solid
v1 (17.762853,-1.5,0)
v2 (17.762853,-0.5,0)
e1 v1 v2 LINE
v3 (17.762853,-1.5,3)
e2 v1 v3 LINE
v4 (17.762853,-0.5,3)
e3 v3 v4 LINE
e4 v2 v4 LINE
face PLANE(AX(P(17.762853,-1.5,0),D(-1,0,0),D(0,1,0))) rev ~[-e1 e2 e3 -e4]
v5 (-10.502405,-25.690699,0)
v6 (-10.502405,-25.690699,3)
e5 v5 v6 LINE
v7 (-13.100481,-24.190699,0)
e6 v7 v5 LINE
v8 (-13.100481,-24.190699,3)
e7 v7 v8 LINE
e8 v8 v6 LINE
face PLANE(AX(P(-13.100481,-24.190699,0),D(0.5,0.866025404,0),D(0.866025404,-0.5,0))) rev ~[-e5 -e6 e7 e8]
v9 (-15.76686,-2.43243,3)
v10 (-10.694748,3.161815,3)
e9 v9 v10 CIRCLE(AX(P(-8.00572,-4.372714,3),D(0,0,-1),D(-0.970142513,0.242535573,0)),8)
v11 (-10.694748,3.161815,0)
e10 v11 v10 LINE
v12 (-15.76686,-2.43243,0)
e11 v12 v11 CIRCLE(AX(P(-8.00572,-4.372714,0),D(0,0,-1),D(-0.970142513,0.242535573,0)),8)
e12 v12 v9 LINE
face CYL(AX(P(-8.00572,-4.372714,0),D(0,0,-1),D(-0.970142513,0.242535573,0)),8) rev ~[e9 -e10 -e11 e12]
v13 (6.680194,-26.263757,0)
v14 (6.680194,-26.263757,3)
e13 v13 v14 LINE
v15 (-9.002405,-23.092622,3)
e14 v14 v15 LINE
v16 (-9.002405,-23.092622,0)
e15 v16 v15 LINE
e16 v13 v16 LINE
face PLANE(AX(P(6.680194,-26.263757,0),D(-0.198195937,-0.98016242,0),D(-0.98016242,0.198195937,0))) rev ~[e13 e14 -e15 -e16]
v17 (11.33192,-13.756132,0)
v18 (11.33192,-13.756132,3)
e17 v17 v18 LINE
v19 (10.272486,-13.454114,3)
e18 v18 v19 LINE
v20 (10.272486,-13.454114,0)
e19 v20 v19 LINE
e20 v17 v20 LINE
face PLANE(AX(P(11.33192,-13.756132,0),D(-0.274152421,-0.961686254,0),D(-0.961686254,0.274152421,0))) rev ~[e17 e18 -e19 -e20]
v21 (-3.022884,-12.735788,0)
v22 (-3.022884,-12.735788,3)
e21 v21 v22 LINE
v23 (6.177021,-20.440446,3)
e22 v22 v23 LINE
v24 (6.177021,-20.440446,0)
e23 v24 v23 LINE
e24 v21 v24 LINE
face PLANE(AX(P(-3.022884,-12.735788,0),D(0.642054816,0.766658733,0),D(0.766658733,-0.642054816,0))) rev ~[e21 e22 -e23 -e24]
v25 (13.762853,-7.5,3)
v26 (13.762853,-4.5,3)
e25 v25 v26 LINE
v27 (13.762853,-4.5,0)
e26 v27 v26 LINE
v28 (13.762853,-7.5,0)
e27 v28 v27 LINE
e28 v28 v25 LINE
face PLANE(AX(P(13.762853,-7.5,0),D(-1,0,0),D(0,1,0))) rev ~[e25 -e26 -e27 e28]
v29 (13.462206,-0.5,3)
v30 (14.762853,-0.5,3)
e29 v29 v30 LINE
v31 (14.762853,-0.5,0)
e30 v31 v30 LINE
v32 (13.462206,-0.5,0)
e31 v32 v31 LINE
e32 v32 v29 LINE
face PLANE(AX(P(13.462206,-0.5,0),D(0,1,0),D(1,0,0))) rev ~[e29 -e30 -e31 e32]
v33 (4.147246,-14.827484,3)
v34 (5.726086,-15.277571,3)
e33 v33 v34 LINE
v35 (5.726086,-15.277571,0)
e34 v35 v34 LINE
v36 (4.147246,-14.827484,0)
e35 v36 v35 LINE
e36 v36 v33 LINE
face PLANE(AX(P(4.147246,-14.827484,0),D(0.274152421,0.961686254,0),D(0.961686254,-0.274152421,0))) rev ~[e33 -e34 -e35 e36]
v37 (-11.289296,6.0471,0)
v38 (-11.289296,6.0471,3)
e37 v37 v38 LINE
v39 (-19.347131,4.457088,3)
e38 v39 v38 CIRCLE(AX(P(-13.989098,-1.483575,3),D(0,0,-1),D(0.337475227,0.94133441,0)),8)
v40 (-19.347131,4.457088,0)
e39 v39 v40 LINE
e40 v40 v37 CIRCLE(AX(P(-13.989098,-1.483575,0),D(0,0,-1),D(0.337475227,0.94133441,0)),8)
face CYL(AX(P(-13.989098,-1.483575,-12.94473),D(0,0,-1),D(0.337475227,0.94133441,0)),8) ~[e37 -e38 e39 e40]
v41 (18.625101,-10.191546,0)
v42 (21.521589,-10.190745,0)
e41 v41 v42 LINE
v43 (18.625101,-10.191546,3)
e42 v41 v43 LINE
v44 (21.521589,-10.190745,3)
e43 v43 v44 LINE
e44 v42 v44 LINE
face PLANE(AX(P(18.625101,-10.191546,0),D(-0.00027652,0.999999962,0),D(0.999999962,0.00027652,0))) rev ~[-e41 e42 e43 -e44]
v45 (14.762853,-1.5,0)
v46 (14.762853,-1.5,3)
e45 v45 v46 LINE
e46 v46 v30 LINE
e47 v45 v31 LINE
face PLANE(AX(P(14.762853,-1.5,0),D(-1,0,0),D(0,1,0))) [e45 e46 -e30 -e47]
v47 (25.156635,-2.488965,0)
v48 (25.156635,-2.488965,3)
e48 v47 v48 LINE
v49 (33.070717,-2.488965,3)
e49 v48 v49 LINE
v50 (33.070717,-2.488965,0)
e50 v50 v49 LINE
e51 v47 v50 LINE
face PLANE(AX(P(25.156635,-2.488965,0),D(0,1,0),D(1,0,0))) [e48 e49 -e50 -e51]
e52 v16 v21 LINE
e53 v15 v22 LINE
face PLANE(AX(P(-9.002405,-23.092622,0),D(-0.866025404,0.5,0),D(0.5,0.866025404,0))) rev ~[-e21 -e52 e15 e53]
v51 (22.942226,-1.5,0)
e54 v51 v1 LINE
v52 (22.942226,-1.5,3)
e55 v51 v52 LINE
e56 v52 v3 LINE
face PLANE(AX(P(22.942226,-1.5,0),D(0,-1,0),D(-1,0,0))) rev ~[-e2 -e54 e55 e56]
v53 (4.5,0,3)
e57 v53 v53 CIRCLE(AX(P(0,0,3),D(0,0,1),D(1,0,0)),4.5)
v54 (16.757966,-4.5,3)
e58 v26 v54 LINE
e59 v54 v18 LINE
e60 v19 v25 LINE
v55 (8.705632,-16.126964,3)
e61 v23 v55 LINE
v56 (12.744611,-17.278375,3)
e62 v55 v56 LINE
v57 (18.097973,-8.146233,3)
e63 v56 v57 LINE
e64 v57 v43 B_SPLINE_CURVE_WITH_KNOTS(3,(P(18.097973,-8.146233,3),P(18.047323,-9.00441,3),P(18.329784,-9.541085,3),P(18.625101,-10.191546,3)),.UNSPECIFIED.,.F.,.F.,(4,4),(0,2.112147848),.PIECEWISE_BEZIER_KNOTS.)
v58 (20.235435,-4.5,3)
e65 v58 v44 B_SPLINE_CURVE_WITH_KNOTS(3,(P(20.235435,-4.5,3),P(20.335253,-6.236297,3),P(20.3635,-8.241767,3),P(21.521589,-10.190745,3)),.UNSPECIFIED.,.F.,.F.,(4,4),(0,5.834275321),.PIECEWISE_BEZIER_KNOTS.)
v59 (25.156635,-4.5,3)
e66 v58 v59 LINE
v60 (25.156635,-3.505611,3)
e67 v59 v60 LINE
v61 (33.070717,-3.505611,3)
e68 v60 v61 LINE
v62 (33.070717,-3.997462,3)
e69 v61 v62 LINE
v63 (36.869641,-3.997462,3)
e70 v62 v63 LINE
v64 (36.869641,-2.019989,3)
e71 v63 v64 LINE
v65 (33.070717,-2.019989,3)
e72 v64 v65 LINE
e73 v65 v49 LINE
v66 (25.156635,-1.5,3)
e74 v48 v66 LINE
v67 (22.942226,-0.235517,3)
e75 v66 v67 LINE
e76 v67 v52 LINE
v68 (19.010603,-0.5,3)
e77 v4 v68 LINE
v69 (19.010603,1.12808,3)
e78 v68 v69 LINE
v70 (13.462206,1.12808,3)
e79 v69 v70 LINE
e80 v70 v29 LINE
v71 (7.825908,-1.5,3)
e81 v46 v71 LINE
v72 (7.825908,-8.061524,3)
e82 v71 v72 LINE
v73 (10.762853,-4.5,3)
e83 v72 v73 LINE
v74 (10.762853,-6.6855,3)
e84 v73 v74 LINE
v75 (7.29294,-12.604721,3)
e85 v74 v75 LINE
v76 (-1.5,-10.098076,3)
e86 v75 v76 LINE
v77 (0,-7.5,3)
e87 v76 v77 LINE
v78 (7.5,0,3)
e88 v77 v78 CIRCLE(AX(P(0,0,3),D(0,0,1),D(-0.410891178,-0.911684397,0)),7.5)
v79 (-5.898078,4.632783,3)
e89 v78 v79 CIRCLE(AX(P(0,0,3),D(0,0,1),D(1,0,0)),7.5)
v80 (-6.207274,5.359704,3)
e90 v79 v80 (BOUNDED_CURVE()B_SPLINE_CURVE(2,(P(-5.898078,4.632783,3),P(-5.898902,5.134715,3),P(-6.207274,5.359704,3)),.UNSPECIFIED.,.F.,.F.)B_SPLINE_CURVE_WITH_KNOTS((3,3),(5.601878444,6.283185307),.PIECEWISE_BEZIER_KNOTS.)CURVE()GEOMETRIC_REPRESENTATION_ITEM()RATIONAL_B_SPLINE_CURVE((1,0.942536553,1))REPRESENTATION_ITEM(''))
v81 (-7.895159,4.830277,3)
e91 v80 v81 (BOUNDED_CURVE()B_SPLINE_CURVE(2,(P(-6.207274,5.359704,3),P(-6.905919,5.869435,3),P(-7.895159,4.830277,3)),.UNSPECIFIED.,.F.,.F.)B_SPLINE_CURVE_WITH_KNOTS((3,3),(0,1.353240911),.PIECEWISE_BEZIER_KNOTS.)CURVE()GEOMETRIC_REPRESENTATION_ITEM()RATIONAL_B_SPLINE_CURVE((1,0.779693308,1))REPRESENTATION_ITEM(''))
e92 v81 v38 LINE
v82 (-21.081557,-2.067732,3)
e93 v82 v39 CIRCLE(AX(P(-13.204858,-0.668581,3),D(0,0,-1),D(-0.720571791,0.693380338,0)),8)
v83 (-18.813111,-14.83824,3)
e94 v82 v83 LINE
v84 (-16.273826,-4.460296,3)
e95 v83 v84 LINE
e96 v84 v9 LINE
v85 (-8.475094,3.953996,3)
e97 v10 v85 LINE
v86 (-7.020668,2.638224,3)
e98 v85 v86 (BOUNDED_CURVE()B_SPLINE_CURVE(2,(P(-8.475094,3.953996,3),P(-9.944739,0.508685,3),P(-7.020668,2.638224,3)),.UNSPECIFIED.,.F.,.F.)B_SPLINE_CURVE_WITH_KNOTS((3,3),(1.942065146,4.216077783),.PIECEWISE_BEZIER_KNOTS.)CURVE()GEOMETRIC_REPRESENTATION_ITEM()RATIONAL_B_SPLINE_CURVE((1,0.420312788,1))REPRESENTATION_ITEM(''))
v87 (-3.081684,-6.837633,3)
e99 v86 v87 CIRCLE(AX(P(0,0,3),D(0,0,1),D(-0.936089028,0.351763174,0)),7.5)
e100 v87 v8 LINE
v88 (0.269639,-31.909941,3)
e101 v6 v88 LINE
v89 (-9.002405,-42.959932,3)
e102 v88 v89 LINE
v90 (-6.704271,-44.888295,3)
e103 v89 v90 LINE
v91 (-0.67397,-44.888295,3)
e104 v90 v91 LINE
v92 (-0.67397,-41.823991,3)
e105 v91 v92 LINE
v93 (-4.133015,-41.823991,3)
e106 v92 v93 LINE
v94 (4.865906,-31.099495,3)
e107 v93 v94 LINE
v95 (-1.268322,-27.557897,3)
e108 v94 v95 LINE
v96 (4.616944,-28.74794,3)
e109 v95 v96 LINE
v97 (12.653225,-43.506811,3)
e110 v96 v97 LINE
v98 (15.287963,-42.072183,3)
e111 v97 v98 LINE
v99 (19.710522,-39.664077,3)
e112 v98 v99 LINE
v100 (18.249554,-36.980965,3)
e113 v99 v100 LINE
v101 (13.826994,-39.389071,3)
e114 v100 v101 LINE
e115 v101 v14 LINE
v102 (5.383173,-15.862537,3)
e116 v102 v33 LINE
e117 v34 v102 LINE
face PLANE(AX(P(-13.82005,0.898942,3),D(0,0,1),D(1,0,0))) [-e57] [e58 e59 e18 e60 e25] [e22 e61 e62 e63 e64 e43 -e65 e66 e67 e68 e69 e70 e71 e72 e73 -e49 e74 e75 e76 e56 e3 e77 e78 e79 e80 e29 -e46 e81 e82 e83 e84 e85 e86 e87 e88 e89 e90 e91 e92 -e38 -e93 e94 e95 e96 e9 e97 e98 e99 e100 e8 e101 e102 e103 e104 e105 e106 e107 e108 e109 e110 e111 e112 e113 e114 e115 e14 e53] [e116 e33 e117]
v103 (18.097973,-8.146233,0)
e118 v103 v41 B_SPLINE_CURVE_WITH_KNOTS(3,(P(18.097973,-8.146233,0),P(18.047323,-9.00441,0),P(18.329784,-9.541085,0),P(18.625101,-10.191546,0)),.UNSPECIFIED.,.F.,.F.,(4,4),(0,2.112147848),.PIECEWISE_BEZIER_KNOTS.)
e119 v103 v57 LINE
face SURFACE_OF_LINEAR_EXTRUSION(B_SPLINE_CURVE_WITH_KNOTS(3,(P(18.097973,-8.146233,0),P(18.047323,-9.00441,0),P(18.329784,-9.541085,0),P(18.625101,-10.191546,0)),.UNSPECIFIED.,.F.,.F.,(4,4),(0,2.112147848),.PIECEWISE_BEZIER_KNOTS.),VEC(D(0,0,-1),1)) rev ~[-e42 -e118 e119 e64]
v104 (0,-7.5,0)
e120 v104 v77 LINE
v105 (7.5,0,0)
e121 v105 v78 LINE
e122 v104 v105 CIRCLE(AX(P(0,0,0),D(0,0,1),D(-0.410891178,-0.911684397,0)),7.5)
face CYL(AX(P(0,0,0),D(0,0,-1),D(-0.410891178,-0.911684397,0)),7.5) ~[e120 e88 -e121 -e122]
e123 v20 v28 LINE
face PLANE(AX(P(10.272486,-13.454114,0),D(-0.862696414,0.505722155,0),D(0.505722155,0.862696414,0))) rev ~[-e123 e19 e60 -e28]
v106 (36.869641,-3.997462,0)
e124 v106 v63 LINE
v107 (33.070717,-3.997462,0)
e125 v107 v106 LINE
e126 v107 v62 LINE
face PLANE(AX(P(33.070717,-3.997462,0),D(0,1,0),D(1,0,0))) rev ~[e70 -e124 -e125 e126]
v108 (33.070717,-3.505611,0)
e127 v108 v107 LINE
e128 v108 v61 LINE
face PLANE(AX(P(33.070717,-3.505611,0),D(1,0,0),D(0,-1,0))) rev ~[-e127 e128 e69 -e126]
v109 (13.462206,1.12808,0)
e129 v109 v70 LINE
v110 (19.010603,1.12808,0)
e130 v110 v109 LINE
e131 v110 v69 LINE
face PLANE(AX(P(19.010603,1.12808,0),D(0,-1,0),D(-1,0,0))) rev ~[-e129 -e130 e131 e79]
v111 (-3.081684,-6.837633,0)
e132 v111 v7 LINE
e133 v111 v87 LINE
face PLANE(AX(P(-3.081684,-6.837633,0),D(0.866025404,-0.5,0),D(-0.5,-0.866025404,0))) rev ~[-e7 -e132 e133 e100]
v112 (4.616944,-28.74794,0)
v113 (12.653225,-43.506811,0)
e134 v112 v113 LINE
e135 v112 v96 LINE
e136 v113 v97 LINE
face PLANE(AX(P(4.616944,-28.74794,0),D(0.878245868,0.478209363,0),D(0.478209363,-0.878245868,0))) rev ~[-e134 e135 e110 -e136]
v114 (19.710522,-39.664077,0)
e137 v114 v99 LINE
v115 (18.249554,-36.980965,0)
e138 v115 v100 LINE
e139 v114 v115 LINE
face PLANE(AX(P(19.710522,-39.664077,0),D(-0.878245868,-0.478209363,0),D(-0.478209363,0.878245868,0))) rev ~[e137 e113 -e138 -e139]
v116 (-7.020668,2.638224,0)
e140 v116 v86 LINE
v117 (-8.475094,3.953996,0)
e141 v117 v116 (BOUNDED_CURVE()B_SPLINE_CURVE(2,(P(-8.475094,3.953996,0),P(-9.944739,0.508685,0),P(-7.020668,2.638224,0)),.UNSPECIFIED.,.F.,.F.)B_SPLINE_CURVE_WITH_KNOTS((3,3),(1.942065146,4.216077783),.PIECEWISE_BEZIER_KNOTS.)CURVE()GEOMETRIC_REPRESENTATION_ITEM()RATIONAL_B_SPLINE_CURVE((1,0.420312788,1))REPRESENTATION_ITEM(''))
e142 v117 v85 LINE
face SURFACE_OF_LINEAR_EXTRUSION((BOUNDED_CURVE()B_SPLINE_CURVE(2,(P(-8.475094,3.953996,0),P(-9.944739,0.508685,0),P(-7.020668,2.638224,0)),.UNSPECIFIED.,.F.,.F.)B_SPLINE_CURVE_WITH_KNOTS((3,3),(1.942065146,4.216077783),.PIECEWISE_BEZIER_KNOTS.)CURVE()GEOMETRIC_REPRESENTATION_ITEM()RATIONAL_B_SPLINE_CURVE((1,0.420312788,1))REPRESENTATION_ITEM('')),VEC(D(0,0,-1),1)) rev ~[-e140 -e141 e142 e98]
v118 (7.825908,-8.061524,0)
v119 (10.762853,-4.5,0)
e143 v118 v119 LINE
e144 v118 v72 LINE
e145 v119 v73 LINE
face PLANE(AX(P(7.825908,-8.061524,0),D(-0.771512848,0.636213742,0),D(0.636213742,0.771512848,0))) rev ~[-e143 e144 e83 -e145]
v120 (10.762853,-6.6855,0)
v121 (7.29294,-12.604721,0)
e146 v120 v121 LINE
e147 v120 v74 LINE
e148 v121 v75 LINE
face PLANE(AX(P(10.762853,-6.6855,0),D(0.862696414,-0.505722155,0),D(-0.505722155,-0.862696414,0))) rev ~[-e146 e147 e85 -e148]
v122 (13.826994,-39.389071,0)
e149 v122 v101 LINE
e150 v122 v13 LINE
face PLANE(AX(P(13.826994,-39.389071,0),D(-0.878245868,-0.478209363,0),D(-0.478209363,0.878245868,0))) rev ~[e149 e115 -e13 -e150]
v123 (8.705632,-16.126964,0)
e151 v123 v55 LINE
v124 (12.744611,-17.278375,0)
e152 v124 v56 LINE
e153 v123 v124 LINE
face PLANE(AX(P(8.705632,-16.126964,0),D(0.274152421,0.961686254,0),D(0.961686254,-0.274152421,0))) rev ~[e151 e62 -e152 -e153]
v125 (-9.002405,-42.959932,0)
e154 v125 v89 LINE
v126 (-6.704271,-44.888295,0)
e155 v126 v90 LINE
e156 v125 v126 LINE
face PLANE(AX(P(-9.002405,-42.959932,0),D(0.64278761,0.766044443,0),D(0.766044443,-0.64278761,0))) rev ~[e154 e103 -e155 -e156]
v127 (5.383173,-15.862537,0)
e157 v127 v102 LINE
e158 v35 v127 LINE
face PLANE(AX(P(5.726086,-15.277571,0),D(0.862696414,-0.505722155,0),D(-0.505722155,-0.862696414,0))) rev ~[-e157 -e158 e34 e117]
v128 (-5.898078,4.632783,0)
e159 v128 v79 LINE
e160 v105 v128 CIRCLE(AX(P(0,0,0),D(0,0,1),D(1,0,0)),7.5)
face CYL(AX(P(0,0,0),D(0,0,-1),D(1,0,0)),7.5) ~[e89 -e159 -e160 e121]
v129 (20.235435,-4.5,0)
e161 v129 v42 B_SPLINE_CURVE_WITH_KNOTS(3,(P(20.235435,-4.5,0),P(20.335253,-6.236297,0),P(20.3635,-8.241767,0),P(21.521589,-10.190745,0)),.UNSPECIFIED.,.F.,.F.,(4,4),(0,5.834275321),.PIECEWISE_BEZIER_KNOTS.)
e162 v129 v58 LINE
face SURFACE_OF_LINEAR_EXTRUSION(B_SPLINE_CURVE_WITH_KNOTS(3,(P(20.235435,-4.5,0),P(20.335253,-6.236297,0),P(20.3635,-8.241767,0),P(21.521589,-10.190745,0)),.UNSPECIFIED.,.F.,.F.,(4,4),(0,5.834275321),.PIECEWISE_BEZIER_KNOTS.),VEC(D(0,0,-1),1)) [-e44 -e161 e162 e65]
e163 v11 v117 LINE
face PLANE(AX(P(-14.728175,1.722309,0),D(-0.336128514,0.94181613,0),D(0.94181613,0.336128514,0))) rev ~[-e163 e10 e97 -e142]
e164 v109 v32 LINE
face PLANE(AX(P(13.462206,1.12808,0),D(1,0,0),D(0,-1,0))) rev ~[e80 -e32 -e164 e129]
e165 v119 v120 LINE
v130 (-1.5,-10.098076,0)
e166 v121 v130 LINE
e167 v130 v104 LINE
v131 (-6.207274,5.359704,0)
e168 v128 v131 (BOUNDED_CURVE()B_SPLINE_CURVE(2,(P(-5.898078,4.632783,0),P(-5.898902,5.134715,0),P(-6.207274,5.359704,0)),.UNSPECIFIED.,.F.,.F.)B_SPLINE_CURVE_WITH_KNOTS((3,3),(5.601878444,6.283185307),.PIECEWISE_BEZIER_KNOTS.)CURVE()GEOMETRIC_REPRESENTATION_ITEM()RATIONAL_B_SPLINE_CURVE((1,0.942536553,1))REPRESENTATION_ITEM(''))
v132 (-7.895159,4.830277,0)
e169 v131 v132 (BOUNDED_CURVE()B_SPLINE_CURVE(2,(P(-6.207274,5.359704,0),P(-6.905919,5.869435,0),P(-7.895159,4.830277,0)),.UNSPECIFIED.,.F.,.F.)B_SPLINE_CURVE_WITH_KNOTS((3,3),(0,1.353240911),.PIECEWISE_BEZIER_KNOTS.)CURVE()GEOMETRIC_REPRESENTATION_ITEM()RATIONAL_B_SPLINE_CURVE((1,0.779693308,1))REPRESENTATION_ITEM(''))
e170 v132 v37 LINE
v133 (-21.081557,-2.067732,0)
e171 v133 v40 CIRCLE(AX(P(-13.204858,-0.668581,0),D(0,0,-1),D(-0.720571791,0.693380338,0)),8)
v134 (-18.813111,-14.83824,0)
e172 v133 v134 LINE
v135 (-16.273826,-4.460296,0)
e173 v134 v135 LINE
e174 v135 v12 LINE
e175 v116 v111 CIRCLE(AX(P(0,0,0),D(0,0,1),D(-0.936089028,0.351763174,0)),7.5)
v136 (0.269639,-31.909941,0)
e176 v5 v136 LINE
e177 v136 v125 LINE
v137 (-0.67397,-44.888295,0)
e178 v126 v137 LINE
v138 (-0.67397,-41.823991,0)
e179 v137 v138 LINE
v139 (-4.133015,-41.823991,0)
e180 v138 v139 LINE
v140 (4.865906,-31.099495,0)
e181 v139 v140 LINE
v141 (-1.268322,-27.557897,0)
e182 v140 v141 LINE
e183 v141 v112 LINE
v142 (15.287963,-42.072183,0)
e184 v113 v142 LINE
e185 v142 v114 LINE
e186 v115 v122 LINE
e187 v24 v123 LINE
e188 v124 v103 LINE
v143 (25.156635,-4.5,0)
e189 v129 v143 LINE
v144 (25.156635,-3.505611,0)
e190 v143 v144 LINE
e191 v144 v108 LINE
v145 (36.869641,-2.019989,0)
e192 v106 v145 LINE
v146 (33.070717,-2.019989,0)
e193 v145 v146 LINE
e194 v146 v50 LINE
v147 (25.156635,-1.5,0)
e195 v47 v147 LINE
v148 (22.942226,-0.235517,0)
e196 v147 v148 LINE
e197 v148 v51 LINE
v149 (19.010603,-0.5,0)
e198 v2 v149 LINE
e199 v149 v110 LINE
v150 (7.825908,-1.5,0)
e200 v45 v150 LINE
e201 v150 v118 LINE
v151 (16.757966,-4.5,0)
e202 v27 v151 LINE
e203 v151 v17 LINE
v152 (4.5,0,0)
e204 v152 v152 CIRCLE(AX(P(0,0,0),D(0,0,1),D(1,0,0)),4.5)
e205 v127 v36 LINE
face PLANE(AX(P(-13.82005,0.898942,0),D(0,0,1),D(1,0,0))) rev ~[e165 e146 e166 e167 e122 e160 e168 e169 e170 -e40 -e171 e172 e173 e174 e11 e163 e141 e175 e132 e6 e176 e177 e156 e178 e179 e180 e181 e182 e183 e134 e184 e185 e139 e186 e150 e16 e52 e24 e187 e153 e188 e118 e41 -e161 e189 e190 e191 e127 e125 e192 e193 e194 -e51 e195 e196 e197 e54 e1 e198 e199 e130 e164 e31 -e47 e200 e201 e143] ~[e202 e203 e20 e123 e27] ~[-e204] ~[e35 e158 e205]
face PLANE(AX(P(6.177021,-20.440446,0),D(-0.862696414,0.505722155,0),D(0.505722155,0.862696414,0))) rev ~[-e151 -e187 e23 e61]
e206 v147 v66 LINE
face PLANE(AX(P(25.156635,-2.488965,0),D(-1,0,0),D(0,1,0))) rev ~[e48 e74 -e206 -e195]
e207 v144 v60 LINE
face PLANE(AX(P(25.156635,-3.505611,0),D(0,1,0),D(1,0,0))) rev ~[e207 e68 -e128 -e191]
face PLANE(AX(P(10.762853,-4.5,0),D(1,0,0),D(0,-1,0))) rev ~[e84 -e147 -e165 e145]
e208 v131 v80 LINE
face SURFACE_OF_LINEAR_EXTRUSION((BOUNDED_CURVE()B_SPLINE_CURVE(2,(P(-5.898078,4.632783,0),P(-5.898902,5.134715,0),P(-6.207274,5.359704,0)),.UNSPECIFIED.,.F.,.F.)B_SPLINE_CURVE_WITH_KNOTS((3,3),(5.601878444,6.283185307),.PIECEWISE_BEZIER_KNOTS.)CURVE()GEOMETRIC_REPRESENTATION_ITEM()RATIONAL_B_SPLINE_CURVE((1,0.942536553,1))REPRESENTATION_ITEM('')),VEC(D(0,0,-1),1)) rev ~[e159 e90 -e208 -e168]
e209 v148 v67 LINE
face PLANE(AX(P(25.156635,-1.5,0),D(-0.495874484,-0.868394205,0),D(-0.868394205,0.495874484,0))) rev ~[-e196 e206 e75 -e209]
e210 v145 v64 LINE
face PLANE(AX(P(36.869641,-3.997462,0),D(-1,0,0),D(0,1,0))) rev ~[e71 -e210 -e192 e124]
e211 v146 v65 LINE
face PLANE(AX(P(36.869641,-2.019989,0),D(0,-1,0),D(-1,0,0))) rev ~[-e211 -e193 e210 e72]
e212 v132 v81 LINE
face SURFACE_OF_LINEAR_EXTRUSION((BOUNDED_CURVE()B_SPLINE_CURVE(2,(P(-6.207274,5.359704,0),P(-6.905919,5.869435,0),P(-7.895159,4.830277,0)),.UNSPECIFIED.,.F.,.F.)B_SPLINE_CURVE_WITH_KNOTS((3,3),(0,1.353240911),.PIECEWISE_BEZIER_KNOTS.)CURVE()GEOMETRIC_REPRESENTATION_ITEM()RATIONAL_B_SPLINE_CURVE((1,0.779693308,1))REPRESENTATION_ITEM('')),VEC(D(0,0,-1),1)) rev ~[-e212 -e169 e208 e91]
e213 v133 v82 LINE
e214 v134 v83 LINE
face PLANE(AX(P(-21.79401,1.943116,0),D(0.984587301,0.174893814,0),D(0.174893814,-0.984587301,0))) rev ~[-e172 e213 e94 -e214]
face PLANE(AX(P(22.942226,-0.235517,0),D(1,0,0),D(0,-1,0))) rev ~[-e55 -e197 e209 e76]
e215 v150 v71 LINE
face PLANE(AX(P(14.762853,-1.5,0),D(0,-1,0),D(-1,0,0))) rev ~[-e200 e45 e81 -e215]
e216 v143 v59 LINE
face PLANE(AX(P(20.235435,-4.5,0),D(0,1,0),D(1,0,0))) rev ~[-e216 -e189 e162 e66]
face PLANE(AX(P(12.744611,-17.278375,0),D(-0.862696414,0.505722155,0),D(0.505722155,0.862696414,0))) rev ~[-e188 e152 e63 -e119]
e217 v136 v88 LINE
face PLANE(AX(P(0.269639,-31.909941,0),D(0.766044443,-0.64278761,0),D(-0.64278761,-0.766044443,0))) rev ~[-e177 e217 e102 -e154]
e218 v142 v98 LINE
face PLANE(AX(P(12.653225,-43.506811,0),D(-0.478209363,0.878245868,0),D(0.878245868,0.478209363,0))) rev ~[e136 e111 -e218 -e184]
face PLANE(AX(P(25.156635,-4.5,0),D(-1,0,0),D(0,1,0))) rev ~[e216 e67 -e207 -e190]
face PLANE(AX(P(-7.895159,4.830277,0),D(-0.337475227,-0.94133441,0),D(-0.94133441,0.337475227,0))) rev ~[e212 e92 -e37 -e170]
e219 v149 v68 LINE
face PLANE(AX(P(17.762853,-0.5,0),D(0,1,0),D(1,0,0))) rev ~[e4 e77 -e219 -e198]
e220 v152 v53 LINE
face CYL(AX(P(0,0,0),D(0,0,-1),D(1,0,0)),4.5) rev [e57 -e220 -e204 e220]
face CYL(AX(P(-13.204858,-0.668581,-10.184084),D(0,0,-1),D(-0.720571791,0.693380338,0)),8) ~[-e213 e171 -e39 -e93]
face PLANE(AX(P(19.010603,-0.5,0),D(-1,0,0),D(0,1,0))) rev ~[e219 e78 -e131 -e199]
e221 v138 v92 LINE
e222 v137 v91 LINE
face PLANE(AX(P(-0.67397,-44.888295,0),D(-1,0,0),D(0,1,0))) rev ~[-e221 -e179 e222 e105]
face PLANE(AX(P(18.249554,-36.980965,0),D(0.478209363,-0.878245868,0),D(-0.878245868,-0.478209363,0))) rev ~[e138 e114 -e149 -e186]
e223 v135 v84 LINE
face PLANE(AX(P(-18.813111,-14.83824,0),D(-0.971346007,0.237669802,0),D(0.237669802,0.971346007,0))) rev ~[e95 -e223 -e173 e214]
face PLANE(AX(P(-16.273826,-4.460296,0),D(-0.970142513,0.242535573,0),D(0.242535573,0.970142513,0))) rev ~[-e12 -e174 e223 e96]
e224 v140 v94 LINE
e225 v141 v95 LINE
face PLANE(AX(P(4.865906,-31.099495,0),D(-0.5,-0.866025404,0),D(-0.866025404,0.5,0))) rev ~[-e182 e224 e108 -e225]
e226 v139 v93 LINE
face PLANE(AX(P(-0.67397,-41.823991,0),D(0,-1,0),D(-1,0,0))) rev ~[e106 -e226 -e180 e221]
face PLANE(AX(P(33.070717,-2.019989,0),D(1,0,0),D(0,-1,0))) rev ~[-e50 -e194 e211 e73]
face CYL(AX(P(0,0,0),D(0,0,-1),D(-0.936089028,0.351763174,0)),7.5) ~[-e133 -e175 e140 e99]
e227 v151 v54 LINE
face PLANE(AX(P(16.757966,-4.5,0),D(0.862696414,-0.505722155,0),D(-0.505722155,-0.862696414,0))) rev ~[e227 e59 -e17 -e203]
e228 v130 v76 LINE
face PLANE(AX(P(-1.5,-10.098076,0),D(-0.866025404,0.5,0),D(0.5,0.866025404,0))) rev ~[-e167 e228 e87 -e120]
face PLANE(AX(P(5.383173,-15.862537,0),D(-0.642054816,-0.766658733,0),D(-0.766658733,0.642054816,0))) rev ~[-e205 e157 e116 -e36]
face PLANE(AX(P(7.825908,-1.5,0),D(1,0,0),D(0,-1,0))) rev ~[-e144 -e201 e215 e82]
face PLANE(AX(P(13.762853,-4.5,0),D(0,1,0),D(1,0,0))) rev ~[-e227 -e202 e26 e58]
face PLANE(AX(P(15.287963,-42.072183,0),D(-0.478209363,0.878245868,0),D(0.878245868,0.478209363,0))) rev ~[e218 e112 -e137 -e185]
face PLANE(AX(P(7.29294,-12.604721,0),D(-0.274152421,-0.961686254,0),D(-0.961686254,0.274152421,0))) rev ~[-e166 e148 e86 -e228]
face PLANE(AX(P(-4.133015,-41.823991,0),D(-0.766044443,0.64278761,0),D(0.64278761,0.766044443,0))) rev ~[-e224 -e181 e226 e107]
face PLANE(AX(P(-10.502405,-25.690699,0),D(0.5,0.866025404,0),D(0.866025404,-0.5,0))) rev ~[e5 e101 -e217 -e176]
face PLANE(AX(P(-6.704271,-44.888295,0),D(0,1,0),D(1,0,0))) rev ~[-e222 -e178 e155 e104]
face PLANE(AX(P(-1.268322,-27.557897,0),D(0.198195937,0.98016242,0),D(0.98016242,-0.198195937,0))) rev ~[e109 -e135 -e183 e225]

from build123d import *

# Parameters (mm, degrees)
F0_W        = 7.9140815362
F0_H        = 1.0166466236
F0_W_2      = 3
F0_H_2      = 1
F0_R        = 4.5
F1_DEPTH    = 3
F2_T1_DEPTH = 3
F2_T3_DEPTH = 28.8894591878
F2_T5_DEPTH = 23.3681675465


# Not quite as in the source:
# - a fillet or chamfer that OpenCascade refuses, or shapes differently, is made with other operations: its cross-section is extruded or revolved along the edge and cut away or added


with BuildPart() as f1:
    # F0 (on Top) → F1 (new body)
    with BuildSketch(Plane.XY):
        Polygon((13.4622063488, -0.5), (14.7628532723, -0.5), (17.7628532723, -0.5), (19.0106034279, -0.5), (19.0106034279, 1.1280798353), (13.4622063488, 1.1280798353), align=None)
        Polygon((10.7628532723, -6.6854998734), (7.292940495, -12.6047210891), (10.2724858996, -13.4541141028), (13.7628532723, -7.5), (13.7628532723, -4.5), (10.7628532723, -4.5), align=None)
        with BuildLine():
            Line((-14.7281754762, 1.7223088071), (-8.4750935815, 3.9539961383))
            add(Edge.make_bspline(
                [(-7.8951590451, 4.8302771503), (-8.2686696422, 4.4379188565), (-8.4750935815, 3.9539961383)],
                knots=[1.3532409109, 1.3532409109, 1.3532409109, 1.9420651459, 1.9420651459, 1.9420651459], degree=2, weights=[1, 0.9569728978, 1]))
            Line((-7.8951590451, 4.8302771503), (-16.1634236574, 7.7945101075))
            Line((-16.1634236574, 7.7945101075), (-21.7940099537, 1.9431159599))
            Line((-21.7940099537, 1.9431159599), (-18.813110888, -14.8382401094))
            Line((-18.813110888, -14.8382401094), (-16.2738263607, -4.4602961279))
            Line((-16.2738263607, -4.4602961279), (-14.7281754762, 1.7223088071))
        make_face()
        Polygon((-4.1330147038, -41.823990643), (-6.7042714065, -44.8882950559), (-0.673970324, -44.8882950559), (-0.673970324, -41.823990643), align=None)
        Polygon((7.292940495, -12.6047210891), (-1.5, -10.0980762114), (4.1472461263, -14.8274837274), (5.7260863187, -15.2775711223), align=None)
        Polygon((33.0707170069, -2.4889647029), (33.0707170069, -3.5056113265), (33.0707170069, -3.9974618703), (36.8696413934, -3.9974618703), (36.8696413934, -2.0199886058), (33.0707170069, -2.0199886058), align=None)
        Polygon((18.2495536771, -36.9809648262), (13.8269943134, -39.3890709971), (15.287962521, -42.0721830228), (19.7105218846, -39.6640768519), align=None)
        with Locations((29.1136762388, -2.9972880147)):
            Rectangle(F0_W, F0_H)
        Polygon((-9.0024047358, -23.0926223927), (-10.5024047358, -25.6906986041), (-1.2683224195, -27.5578969), align=None)
        with BuildLine():
            add(Edge.make_bspline(
                [(-8.4750935815, 3.9539961383), (-9.9447387818, 0.5086849859), (-7.0206677136, 2.6382238069)],
                knots=[1.9420651459, 1.9420651459, 1.9420651459, 4.2160777827, 4.2160777827, 4.2160777827], degree=2, weights=[1, 0.420312788, 1]))
            ThreePointArc((-7.0206677136, 2.6382238069), (-6.5359057109, 3.6785780593), (-5.8980778892, 4.6327828799))
            add(Edge.make_bspline(
                [(-5.8980778892, 4.6327828799), (-5.898901623, 5.1347150622), (-6.2072743134, 5.3597039059)],
                knots=[5.6018784444, 5.6018784444, 5.6018784444, 6.2831853072, 6.2831853072, 6.2831853072], degree=2, weights=[1, 0.9425365533, 1]))
            add(Edge.make_bspline(
                [(-6.2072743134, 5.3597039059), (-6.9059188983, 5.8694352869), (-7.8951590451, 4.8302771503)],
                knots=[0, 0, 0, 1.3532409109, 1.3532409109, 1.3532409109], degree=2, weights=[1, 0.7796933083, 1]))
            add(Edge.make_bspline(
                [(-7.8951590451, 4.8302771503), (-8.2686696422, 4.4379188565), (-8.4750935815, 3.9539961383)],
                knots=[1.3532409109, 1.3532409109, 1.3532409109, 1.9420651459, 1.9420651459, 1.9420651459], degree=2, weights=[1, 0.9569728978, 1]))
        make_face()
        Polygon((8.7628532723, -4.5), (10.7628532723, -4.5), (13.7628532723, -4.5), (16.7579661865, -4.5), (20.2354351463, -4.5), (25.1566354707, -4.5), (25.1566354707, -3.5056113265), (25.1566354707, -2.4889647029), (25.1566354707, -1.5), (22.9422256299, -1.5), (17.7628532723, -1.5), (14.7628532723, -1.5), (8.7628532723, -1.5), align=None)
        with BuildLine():
            Line((20.2354351463, -4.5), (18.0979731586, -8.1462329624))
            add(Edge.make_bspline(
                [(18.0979731586, -8.1462329624), (18.0473234504, -9.0044103563), (18.3297842741, -9.5410849899), (18.6251010746, -10.1915458217)],
                knots=[0, 0, 0, 0, 2.1121478481, 2.1121478481, 2.1121478481, 2.1121478481], degree=3))
            Line((18.6251010746, -10.1915458217), (21.5215887874, -10.1907448843))
            add(Edge.make_bspline(
                [(20.2354351463, -4.5), (20.3352533281, -6.2362966128), (20.3635003418, -8.2417670637), (21.5215887874, -10.1907448843)],
                knots=[0, 0, 0, 0, 5.8342753215, 5.8342753215, 5.8342753215, 5.8342753215], degree=3))
        make_face()
        with BuildLine():
            ThreePointArc((0, -7.5), (-1.5760318318, -7.3325386917), (-3.0816838363, -6.8376329774))
            Line((-3.0816838363, -6.8376329774), (-13.1004809472, -24.1906986041))
            Line((-13.1004809472, -24.1906986041), (-10.5024047358, -25.6906986041))
            Line((-10.5024047358, -25.6906986041), (-9.0024047358, -23.0926223927))
            Line((-9.0024047358, -23.0926223927), (-3.0228838472, -12.7357884087))
            Line((-3.0228838472, -12.7357884087), (-1.5, -10.0980762114))
            Line((-1.5, -10.0980762114), (0, -7.5))
        make_face()
        with BuildLine():
            ThreePointArc((-5.8980778892, 4.6327828799), (-6.5359057109, 3.6785780593), (-7.0206677136, 2.6382238069))
            add(Edge.make_bspline(
                [(-7.0206677136, 2.6382238069), (-5.896148589, 3.4571871888), (-5.8980778892, 4.6327828799)],
                knots=[4.2160777827, 4.2160777827, 4.2160777827, 5.6018784444, 5.6018784444, 5.6018784444], degree=2, weights=[1, 0.7693966053, 1]))
        make_face()
        Polygon((11.3319195864, -13.7561318437), (10.2724858996, -13.4541141028), (8.7056317233, -16.1269641361), (12.7446108147, -17.2783748907), (18.0979731586, -8.1462329624), (20.2354351463, -4.5), (16.7579661865, -4.5), align=None)
        Polygon((7.8259082511, -8.0615244806), (10.7628532723, -4.5), (8.7628532723, -4.5), (8.7628532723, -1.5), (7.8259082511, -1.5), align=None)
        with Locations((16.2628532723, -1)):
            Rectangle(F0_W_2, F0_H_2)
        with BuildLine():
            ThreePointArc((-7.0206677136, 2.6382238069), (-6.9254849764, -2.8788292484), (-3.0816838363, -6.8376329774))
            ThreePointArc((-3.0816838363, -6.8376329774), (-1.5760318318, -7.3325386917), (0, -7.5))
            ThreePointArc((0, -7.5), (5.3033008589, -5.3033008589), (7.5, 0))
            ThreePointArc((7.5, 0), (2.4509606107, 7.088215014), (-5.8980778892, 4.6327828799))
            add(Edge.make_bspline(
                [(-7.0206677136, 2.6382238069), (-5.896148589, 3.4571871888), (-5.8980778892, 4.6327828799)],
                knots=[4.2160777827, 4.2160777827, 4.2160777827, 5.6018784444, 5.6018784444, 5.6018784444], degree=2, weights=[1, 0.7693966053, 1]))
        make_face()
        Circle(F0_R, mode=Mode.SUBTRACT)
        Polygon((-1.2683224195, -27.5578969), (-10.5024047358, -25.6906986041), (0.2696389092, -31.9099409022), (-9.0024047358, -42.9599322269), (-6.7042714065, -44.8882950559), (-4.1330147038, -41.823990643), (4.8659055679, -31.0994950798), align=None)
        Polygon((10.2724858996, -13.4541141028), (7.292940495, -12.6047210891), (5.7260863187, -15.2775711223), (8.7056317233, -16.1269641361), align=None)
        Polygon((22.9422256299, -0.2355174292), (22.9422256299, -1.5), (25.1566354707, -1.5), align=None)
        Polygon((6.6801939907, -26.2637573918), (-9.0024047358, -23.0926223927), (-1.2683224195, -27.5578969), (4.616944438, -28.7479404659), (12.6532249158, -43.5068111111), (15.287962521, -42.0721830228), (13.8269943134, -39.3890709971), align=None)
        Polygon((4.1472461263, -14.8274837274), (-1.5, -10.0980762114), (-3.0228838472, -12.7357884087), (6.1770209488, -20.4404462041), (8.7056317233, -16.1269641361), (5.7260863187, -15.2775711223), (5.3831728236, -15.8625370756), align=None)
    extrude(amount=F1_DEPTH)

    # F2: fillet of radius 8 on 3 edges, made by hand

    # F2_s2 → F2_t1 (join)
    with BuildSketch(Plane.XY):
        with BuildLine():
            ThreePointArc((-15.7668598362, -2.4324295718), (-13.9323879929, 1.0007952454), (-10.6947478435, 3.1618148779))
            Line((-10.6947478435, 3.1618148779), (-14.7281754762, 1.7223088071))
            Line((-14.7281754762, 1.7223088071), (-15.7668598362, -2.4324295718))
        make_face()
    extrude(amount=F2_T1_DEPTH)

    # F2_s4 → F2_t3 (cut)
    with BuildSketch(Plane.XY.offset(-12.9447295939)):
        with BuildLine():
            ThreePointArc((-11.2892959012, 6.0470998817), (-15.8144489693, 6.3053971181), (-19.7536720515, 4.0634673109))
            Line((-19.7536720515, 4.0634673109), (-16.1634236574, 7.7945101075))
            Line((-16.1634236574, 7.7945101075), (-11.2892959012, 6.0470998817))
        make_face()
    extrude(amount=F2_T3_DEPTH, mode=Mode.SUBTRACT)

    # F2_s6 → F2_t5 (cut)
    with BuildSketch(Plane.XY.offset(-10.1840837733)):
        with BuildLine():
            ThreePointArc((-18.9694325729, 4.8784613548), (-20.8588428617, 1.6587603608), (-21.0815566526, -2.0677318634))
            Line((-21.0815566526, -2.0677318634), (-21.7940099537, 1.9431159599))
            Line((-21.7940099537, 1.9431159599), (-18.9694325729, 4.8784613548))
        make_face()
    extrude(amount=F2_T5_DEPTH, mode=Mode.SUBTRACT)


solid = f1.part
